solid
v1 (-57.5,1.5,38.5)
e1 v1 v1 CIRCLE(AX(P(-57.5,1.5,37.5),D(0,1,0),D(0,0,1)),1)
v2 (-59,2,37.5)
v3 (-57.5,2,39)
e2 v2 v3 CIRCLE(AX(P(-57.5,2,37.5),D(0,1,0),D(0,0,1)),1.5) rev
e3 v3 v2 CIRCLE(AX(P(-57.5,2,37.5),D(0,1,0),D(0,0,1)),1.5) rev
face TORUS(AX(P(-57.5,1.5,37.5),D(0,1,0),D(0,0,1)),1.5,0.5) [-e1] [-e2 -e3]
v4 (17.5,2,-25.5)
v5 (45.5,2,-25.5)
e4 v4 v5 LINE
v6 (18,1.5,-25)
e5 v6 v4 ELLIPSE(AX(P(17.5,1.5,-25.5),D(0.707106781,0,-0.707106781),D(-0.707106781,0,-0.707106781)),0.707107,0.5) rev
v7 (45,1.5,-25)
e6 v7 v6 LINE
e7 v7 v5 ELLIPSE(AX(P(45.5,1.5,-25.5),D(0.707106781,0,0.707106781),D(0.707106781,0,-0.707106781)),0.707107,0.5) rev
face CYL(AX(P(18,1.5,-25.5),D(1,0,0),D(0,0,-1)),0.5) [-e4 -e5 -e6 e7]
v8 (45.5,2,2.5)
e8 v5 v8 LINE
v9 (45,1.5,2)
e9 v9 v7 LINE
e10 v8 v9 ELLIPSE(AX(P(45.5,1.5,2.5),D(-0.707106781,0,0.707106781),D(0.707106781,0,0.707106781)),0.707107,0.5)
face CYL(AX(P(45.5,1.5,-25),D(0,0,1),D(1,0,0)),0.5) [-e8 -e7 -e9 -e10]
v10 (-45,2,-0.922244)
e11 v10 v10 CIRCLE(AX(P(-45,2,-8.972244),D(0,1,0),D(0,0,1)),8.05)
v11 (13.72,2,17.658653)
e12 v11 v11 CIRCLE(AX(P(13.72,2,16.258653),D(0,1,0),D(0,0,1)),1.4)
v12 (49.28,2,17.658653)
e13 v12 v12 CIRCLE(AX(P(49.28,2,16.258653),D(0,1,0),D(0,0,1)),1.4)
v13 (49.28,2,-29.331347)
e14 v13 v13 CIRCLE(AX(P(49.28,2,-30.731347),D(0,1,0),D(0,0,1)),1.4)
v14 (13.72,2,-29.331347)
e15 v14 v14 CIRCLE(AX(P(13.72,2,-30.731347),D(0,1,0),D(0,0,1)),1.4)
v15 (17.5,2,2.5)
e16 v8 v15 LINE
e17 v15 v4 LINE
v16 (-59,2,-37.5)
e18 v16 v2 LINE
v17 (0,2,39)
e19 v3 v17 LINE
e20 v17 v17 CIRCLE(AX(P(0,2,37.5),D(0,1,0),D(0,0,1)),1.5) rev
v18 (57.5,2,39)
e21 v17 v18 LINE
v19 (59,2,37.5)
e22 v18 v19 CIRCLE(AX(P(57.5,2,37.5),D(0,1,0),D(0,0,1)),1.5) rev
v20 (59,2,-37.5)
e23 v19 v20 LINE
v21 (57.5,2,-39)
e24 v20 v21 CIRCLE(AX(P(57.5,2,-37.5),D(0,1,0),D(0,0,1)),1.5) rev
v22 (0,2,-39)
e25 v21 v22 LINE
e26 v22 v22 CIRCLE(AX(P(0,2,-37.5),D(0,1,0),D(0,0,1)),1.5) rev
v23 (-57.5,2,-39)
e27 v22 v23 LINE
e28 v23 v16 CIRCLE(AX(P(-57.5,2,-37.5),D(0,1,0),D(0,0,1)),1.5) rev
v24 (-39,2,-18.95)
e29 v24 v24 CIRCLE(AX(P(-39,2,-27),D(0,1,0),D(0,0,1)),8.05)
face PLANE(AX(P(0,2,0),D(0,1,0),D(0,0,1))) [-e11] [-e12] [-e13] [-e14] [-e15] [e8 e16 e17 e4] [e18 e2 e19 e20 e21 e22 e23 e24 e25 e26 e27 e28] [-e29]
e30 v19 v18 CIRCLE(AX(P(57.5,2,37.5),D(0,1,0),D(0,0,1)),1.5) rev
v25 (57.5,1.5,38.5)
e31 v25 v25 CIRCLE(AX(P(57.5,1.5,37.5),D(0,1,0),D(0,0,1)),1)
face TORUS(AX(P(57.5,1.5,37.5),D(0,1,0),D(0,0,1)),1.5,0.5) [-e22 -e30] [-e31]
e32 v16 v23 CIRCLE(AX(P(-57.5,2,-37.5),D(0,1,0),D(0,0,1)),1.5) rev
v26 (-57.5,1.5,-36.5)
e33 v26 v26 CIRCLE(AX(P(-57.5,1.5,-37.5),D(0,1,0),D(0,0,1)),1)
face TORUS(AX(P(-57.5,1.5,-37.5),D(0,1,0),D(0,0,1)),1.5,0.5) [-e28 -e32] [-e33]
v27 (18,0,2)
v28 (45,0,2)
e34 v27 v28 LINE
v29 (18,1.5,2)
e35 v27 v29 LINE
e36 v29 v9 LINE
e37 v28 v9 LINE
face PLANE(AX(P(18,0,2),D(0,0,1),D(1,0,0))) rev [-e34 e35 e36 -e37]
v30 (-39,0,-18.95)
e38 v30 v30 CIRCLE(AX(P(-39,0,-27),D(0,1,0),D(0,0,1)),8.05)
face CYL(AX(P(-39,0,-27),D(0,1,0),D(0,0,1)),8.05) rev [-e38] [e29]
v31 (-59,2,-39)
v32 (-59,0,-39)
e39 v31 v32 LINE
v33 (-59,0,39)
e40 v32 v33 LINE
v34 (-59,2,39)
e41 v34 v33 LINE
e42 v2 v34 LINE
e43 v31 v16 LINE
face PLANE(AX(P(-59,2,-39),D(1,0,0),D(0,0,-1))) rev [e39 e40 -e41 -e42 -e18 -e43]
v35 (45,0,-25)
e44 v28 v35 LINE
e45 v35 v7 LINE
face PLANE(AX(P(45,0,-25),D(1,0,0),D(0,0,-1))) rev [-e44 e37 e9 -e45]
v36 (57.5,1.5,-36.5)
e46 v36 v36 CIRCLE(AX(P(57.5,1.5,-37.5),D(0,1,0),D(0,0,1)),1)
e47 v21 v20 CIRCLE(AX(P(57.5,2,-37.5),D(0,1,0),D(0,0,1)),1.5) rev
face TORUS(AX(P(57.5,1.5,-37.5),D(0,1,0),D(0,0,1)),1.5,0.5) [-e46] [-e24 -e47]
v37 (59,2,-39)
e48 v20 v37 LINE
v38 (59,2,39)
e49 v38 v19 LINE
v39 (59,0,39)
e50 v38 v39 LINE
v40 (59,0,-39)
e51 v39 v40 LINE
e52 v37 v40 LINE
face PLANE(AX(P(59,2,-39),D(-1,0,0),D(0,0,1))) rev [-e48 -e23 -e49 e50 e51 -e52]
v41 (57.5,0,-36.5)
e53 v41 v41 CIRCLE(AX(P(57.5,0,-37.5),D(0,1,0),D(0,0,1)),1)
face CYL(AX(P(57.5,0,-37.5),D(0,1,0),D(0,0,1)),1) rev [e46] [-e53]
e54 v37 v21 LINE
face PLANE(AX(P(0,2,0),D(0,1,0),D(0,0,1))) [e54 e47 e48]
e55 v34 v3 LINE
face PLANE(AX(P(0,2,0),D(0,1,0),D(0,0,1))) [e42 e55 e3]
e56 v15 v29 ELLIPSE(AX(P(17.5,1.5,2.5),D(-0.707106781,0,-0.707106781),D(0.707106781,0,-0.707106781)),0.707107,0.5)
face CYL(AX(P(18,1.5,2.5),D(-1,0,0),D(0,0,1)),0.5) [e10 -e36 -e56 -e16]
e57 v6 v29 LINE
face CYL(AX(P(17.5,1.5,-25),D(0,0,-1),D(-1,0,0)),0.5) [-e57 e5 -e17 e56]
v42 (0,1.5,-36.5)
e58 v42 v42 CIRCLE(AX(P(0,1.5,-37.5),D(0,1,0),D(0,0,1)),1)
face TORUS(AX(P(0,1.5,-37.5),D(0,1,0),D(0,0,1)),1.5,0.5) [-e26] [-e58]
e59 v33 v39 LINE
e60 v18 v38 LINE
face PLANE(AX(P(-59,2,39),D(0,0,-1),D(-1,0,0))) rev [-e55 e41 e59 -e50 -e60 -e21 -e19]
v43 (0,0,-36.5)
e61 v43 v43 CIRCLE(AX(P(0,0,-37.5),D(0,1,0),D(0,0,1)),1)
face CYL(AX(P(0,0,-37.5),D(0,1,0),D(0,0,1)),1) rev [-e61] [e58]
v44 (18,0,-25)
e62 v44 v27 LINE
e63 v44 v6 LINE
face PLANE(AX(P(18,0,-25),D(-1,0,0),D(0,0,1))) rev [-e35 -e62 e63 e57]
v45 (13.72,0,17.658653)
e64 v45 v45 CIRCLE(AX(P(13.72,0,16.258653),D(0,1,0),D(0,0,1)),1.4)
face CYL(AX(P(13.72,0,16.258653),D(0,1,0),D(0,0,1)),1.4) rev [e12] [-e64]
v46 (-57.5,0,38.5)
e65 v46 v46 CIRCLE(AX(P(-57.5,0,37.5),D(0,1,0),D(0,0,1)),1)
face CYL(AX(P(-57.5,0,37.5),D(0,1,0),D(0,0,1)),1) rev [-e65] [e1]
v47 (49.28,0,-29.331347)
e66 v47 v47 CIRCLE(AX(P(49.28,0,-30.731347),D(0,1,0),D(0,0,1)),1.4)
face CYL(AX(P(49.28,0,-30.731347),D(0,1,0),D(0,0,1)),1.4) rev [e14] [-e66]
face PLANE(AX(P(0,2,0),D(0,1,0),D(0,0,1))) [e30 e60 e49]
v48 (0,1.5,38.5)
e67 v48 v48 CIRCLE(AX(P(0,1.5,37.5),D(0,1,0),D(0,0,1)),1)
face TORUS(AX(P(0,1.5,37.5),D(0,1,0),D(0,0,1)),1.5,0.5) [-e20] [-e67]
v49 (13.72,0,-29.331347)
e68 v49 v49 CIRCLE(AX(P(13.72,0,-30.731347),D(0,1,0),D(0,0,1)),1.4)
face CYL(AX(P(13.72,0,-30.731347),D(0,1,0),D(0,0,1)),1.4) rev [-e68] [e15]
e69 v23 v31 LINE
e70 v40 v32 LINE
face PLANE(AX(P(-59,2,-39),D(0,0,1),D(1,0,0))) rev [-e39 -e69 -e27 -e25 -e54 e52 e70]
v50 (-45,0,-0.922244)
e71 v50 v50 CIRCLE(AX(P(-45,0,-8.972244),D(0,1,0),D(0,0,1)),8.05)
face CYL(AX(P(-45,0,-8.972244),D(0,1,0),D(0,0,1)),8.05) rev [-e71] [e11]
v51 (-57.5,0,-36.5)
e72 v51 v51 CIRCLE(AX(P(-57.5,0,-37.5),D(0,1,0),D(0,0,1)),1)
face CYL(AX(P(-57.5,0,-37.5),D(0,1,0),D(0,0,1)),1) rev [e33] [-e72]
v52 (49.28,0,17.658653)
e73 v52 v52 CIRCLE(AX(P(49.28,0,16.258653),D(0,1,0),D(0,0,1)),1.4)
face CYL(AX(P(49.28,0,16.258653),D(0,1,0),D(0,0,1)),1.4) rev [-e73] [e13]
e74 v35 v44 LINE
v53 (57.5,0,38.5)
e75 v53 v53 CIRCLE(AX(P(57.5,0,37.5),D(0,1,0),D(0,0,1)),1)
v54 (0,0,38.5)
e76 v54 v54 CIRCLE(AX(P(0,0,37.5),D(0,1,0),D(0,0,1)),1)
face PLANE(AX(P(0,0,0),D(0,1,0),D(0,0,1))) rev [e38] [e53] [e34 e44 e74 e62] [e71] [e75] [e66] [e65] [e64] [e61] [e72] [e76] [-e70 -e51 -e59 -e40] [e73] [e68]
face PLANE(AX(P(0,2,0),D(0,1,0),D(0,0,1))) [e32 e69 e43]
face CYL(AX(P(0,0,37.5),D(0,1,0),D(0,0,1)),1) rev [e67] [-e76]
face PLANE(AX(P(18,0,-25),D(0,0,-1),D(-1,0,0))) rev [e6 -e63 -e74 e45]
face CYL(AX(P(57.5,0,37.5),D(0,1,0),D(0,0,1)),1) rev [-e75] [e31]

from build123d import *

# Parameters (mm, degrees)
SKETCH1_W           = 118
SKETCH1_H           = 78
BOSS_EXTRUDE1_DEPTH = 2
SKETCH2_R           = 8.05
BUTTONS_DEPTH       = 2
SKETCH3_R           = 1.4
SKETCH3_W           = 27
SKETCH3_H           = 27
OLED_DEPTH          = 2
SKETCH4_R           = 1
SCREW_HOLES_DEPTH   = 2
FILLETS_R           = 0.5


with BuildPart() as part:
    # Sketch1 → Boss-Extrude1 (new body)
    with BuildSketch(Plane(origin=(0, 0, 0), x_dir=(1, 0, 0), z_dir=(0, 1, 0))):
        Rectangle(SKETCH1_W, SKETCH1_H)
    extrude(amount=BOSS_EXTRUDE1_DEPTH)

    # Sketch2 → Buttons (cut)
    with BuildSketch(Plane(origin=(0, 2, 0), x_dir=(1, 0, 0), z_dir=(0, 1, 0))):
        with Locations(Location((-39, 27, 0), (0, 0, 270))):
            Circle(SKETCH2_R)
        with Locations(Location((-45, 8.972243623, 0), (0, 0, 270))):
            Circle(SKETCH2_R)
    extrude(amount=-BUTTONS_DEPTH, mode=Mode.SUBTRACT)

    # Sketch3 → OLED (cut)
    with BuildSketch(Plane(origin=(0, 2, 0), x_dir=(1, 0, 0), z_dir=(0, 1, 0))):
        with Locations(Location((13.72, 30.73134663, 0), (0, 0, 270))):
            Circle(SKETCH3_R)
        with Locations(Location((49.28, 30.73134663, 0), (0, 0, 270))):
            Circle(SKETCH3_R)
        with Locations(Location((13.72, -16.25865337, 0), (0, 0, 270))):
            Circle(SKETCH3_R)
        with Locations(Location((49.28, -16.25865337, 0), (0, 0, 270))):
            Circle(SKETCH3_R)
        with Locations((31.5, 11.5)):
            Rectangle(SKETCH3_W, SKETCH3_H)
    extrude(amount=-OLED_DEPTH, mode=Mode.SUBTRACT)

    # Sketch4 → Screw Holes (cut)
    with BuildSketch(Plane(origin=(0, 2, 0), x_dir=(1, 0, 0), z_dir=(0, 1, 0))):
        with Locations(Location((-57.5, 37.5, 0), (0, 0, 270))):
            Circle(SKETCH4_R)
        with Locations(Location((-57.5, -37.5, 0), (0, 0, 270))):
            Circle(SKETCH4_R)
        with Locations(Location((57.5, -37.5, 0), (0, 0, 270))):
            Circle(SKETCH4_R)
        with Locations(Location((57.5, 37.5, 0), (0, 0, 270))):
            Circle(SKETCH4_R)
        with Locations(Location((0, 37.5, 0), (0, 0, 270))):
            Circle(SKETCH4_R)
        with Locations(Location((0, -37.5, 0), (0, 0, 270))):
            Circle(SKETCH4_R)
    extrude(amount=-SCREW_HOLES_DEPTH, mode=Mode.SUBTRACT)

    # Fillets
    fillets_edges = [part.edges().sort_by_distance(p)[0] for p in [
        (18, 2, -11.5),
        (31.5, 2, 2),
        (45, 2, -11.5),
        (31.5, 2, -25),
        (-57.5, 2, 36.5),
        (57.5, 2, 36.5),
        (57.5, 2, -38.5),
        (0, 2, -38.5),
        (0, 2, 36.5),
        (-57.5, 2, -38.5),
    ]]
    fillet(fillets_edges, radius=FILLETS_R - 0.0001)  # a hair under: the kernel refuses the full size


solid = part.part
